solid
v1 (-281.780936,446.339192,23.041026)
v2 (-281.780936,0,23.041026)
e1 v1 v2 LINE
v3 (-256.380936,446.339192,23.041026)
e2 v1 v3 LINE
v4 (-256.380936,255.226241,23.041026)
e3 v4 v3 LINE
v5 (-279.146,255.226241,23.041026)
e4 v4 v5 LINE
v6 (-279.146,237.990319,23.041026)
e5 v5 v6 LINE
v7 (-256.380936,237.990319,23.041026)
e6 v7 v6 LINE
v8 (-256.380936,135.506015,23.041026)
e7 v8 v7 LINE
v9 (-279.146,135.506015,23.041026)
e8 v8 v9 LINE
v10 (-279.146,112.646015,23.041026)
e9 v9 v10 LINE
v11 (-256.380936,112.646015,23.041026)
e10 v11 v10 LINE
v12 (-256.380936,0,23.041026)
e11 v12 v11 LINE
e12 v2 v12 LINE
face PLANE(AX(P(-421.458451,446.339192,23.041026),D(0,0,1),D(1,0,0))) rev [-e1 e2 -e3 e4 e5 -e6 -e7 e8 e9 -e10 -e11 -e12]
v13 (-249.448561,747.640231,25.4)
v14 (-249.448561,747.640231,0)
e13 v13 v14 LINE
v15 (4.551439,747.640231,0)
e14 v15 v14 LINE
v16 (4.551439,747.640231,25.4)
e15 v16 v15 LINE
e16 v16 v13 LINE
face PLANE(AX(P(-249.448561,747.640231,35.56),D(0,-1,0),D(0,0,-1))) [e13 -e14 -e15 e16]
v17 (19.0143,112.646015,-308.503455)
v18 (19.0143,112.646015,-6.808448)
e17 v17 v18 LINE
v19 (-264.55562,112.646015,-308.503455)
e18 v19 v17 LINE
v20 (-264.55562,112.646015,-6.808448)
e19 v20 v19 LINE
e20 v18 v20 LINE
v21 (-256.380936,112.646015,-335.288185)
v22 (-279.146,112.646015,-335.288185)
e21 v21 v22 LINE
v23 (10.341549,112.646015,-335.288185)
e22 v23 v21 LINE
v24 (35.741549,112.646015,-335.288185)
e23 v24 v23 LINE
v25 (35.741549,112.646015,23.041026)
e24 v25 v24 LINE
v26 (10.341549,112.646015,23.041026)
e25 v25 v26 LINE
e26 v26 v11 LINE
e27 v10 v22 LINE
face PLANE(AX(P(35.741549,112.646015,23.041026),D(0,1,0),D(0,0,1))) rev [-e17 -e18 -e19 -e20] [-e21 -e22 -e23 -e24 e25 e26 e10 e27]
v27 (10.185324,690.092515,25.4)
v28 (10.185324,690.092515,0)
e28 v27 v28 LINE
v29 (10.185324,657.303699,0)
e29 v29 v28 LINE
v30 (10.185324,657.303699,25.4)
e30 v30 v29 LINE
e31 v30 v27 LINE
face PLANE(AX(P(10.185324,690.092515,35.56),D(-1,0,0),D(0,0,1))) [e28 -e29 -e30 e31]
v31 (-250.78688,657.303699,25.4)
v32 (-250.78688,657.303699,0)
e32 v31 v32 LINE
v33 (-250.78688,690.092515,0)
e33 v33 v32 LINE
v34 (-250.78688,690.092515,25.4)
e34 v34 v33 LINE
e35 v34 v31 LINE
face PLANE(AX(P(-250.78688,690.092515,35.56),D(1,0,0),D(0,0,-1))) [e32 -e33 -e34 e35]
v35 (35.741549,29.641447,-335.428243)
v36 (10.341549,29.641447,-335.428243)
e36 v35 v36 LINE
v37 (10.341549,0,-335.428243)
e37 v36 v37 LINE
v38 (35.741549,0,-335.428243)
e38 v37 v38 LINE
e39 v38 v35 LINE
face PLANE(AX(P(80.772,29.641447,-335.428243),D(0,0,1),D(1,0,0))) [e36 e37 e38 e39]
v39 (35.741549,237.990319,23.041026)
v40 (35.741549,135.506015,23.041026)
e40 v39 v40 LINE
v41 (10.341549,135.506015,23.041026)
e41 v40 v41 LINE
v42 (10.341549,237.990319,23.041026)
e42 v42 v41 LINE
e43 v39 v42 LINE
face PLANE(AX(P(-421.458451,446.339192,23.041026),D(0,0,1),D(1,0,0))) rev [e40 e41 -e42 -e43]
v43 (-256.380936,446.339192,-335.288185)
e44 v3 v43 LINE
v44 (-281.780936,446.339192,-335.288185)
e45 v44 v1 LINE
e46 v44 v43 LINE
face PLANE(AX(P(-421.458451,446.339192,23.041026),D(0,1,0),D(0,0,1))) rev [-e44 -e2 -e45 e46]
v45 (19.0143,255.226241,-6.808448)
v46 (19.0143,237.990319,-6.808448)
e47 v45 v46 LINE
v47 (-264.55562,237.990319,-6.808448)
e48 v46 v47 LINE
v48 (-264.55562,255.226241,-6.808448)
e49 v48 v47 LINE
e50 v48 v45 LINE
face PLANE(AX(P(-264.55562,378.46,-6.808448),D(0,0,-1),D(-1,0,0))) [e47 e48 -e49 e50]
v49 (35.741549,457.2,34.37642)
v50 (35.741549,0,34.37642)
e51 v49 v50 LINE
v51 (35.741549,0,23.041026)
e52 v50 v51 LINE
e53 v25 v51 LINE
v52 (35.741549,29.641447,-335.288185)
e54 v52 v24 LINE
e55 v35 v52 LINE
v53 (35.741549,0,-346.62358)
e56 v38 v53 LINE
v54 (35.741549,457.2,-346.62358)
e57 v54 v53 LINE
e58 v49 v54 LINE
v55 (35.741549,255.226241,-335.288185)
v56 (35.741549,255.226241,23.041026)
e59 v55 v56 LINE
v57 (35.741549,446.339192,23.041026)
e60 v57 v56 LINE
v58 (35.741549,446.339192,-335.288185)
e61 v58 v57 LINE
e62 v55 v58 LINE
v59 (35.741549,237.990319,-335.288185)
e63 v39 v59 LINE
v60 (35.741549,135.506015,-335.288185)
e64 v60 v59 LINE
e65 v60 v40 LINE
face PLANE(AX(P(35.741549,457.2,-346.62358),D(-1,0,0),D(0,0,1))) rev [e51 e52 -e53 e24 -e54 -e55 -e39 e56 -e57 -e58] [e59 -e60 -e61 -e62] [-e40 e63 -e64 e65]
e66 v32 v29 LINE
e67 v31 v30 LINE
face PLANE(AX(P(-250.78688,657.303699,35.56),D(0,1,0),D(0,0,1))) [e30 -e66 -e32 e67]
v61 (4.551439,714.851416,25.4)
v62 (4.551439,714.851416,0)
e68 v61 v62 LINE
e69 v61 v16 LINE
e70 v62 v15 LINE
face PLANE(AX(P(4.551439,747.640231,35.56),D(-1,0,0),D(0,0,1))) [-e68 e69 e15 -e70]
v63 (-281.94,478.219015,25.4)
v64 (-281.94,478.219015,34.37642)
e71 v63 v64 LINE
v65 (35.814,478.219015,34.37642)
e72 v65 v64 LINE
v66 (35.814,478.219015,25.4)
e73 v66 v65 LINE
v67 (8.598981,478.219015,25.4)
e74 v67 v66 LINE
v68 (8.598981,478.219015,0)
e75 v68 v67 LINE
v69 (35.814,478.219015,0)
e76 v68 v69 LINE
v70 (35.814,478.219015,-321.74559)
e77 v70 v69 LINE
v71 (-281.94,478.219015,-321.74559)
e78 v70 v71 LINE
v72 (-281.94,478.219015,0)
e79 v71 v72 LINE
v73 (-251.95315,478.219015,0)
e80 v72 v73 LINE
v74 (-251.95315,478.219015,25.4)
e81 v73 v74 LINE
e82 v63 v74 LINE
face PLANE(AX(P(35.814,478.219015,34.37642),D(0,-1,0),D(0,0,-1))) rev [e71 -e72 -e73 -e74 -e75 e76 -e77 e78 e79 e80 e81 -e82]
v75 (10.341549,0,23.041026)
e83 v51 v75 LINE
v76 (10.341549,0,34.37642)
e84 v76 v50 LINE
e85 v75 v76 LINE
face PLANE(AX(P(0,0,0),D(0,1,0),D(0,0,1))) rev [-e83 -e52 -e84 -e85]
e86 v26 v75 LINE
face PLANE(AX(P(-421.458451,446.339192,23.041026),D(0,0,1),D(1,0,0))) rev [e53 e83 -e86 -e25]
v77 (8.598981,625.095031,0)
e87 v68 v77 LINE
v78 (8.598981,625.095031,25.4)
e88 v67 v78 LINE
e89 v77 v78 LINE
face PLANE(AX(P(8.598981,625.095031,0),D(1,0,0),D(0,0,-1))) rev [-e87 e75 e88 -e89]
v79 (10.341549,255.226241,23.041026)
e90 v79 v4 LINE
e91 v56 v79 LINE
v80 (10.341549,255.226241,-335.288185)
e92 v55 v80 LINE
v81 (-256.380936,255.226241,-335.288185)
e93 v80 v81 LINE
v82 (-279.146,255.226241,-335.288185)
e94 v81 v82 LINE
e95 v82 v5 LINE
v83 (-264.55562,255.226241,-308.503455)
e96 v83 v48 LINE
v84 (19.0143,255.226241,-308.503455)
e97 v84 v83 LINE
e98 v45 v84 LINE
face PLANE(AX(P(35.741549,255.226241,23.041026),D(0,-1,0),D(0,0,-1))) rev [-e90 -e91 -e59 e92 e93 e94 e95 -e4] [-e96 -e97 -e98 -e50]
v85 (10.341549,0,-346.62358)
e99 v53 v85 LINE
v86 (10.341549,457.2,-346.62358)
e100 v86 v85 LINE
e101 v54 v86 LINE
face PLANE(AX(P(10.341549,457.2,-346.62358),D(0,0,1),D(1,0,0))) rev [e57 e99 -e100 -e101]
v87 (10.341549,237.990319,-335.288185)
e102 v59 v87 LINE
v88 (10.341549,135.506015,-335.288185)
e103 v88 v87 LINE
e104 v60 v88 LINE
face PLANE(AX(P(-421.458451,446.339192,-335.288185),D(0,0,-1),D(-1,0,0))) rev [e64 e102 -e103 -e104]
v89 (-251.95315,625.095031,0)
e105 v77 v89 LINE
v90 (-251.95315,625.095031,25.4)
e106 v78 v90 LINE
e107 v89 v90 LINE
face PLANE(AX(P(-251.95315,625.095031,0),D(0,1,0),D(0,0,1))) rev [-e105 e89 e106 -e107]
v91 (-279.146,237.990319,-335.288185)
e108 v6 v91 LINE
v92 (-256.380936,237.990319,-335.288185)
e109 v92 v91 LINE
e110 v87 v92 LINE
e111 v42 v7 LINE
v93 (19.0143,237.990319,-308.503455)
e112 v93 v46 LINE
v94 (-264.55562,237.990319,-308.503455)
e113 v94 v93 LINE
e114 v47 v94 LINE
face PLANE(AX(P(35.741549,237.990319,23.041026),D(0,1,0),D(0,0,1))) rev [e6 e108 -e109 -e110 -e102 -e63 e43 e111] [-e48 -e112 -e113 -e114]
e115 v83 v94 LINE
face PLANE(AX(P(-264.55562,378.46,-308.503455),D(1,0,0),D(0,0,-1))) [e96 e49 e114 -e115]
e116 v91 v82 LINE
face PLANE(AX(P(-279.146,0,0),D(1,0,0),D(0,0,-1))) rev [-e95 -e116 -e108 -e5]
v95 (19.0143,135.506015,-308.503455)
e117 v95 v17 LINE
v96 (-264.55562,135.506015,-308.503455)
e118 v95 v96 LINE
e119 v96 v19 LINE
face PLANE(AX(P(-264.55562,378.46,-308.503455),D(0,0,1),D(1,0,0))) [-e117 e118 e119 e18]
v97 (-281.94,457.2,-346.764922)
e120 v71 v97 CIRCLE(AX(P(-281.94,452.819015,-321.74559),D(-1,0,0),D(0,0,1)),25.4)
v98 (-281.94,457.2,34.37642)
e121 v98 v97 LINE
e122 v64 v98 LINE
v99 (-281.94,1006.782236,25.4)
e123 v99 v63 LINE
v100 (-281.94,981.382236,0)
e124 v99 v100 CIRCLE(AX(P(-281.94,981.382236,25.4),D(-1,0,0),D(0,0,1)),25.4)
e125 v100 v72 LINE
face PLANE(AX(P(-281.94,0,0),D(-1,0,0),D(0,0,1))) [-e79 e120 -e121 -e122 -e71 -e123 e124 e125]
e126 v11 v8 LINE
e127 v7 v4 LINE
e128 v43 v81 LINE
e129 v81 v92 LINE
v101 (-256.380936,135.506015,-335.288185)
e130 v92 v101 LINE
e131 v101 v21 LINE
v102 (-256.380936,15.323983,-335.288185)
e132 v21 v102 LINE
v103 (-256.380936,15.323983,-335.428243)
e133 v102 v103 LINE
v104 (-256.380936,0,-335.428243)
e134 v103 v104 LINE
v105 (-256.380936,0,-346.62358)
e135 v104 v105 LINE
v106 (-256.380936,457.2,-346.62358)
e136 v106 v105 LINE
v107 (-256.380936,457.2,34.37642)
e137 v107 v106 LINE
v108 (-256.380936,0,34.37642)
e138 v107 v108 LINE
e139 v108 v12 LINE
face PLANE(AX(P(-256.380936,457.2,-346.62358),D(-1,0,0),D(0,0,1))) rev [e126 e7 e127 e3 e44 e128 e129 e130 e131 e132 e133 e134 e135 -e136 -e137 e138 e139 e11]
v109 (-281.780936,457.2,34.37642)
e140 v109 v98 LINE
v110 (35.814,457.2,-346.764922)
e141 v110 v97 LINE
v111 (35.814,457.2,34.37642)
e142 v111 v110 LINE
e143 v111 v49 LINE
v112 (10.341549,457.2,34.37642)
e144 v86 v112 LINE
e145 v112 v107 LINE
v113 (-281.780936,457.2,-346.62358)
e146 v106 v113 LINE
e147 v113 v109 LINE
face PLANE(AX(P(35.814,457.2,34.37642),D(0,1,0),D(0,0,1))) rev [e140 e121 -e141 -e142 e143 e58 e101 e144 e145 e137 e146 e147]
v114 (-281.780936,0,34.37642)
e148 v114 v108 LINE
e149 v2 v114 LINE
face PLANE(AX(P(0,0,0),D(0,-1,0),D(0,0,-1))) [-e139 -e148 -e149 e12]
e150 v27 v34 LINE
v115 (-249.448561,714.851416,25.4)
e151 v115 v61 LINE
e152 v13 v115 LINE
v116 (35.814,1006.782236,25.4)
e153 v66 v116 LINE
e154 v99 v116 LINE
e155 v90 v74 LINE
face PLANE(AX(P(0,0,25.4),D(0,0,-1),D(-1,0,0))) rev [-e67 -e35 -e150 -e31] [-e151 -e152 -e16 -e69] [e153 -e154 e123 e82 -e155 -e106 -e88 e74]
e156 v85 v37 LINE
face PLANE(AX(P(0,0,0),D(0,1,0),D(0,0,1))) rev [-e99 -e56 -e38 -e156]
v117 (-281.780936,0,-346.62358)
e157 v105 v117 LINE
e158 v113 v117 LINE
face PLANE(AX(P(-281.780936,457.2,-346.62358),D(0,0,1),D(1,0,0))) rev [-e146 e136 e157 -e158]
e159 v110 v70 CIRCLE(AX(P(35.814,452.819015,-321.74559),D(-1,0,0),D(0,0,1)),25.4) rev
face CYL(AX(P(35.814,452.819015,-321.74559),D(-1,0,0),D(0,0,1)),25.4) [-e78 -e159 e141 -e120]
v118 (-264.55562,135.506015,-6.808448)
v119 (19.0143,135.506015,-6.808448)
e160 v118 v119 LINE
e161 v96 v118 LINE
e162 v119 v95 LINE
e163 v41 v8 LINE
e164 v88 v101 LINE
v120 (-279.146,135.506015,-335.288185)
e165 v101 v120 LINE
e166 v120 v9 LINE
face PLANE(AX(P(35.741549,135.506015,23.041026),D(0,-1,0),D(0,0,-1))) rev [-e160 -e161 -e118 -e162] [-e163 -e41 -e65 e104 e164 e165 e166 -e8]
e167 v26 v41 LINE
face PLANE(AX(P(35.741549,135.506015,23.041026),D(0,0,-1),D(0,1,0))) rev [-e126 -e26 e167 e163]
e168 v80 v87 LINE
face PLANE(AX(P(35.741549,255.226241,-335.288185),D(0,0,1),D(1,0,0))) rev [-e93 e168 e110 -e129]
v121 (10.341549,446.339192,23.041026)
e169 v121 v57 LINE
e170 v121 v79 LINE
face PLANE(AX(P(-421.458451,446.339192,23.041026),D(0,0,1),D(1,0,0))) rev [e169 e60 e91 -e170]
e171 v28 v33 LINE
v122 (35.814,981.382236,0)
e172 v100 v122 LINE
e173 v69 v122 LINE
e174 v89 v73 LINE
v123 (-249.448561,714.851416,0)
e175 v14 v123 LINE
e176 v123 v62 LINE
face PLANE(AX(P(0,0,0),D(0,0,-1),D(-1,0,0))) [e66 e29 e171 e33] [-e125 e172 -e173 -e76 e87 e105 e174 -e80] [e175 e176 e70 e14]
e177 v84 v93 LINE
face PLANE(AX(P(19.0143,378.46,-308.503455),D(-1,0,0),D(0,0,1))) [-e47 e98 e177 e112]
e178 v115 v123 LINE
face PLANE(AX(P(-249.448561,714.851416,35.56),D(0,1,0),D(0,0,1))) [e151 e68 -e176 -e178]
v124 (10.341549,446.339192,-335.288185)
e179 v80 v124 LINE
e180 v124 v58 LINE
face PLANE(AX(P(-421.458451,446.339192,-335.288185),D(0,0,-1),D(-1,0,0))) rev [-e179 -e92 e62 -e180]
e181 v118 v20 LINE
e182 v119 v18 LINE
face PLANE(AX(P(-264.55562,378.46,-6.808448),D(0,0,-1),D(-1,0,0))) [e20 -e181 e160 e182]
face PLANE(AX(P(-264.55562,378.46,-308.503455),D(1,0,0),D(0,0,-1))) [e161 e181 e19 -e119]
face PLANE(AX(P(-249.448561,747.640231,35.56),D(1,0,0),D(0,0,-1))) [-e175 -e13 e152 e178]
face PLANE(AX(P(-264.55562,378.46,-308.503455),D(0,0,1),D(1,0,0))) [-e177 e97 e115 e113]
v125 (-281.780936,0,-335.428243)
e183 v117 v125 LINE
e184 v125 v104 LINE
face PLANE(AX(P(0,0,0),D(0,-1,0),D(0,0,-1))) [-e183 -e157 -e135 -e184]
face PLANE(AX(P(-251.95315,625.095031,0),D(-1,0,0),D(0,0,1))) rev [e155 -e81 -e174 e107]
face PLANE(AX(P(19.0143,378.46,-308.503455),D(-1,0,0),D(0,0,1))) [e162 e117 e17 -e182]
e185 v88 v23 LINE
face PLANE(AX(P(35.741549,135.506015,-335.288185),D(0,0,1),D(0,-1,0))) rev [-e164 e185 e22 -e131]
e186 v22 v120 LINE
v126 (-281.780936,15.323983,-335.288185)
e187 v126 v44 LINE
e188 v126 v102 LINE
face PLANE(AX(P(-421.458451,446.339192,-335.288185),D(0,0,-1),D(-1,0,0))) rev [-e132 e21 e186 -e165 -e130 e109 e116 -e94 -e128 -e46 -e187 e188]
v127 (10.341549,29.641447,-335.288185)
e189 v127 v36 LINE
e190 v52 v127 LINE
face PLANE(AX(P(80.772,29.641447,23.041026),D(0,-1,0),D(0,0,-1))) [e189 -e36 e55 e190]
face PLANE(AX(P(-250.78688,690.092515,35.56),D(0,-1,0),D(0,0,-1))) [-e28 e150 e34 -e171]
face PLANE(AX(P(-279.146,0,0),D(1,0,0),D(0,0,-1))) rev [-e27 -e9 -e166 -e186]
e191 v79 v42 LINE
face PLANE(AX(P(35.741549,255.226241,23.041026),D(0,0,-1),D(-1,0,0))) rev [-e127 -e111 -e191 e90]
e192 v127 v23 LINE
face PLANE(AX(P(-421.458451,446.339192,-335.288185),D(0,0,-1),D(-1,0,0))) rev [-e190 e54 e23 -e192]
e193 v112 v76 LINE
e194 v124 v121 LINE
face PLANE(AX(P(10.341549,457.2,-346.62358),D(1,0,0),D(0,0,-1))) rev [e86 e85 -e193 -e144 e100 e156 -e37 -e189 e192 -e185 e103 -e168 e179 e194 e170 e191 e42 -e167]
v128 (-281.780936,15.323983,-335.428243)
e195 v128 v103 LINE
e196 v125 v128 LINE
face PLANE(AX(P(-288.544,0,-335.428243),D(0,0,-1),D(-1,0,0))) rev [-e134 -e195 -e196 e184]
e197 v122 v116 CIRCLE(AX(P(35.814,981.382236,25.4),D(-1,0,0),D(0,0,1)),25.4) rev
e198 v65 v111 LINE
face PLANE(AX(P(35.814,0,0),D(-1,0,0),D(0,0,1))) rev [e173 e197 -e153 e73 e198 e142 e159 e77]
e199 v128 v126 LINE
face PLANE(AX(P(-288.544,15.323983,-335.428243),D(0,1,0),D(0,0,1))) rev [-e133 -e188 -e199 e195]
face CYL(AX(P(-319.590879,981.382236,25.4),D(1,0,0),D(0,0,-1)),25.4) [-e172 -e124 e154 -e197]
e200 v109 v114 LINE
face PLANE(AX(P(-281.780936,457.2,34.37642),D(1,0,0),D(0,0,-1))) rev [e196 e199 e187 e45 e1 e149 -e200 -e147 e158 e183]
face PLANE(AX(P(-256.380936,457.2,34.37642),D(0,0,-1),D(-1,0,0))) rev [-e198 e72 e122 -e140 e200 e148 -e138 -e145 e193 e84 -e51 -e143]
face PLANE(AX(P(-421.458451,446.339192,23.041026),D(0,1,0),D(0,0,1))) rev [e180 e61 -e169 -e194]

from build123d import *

# Parameters (mm, degrees)
SKETCH1_W                = 25.4
SKETCH1_H                = 381
BOSS_EXTRUDE1_DEPTH      = 457.2
BOSS_EXTRUDE1_2_DEPTH    = 457.2
SKETCH5_W                = 358.329211732
SKETCH5_H                = 431.015208417
CUT_EXTRUDE1_DEPTH       = 457.2
BOSS_EXTRUDE7_DEPTH      = 35.814
BOSS_EXTRUDE7_DEPTH_BACK = 281.94
SKETCH13_W               = 381.141342185
SKETCH13_H               = 21.019014934
SKETCH14_W               = 317.754
SKETCH14_H               = 526.086170676
BOSS_EXTRUDE8_DEPTH      = 25.4
SKETCH17_W               = 260.552131225
SKETCH17_H               = 146.876016362
SKETCH17_H_2             = 29.104227424
CUT_EXTRUDE3_DEPTH       = 25.4
BOSS_EXTRUDE9_DEPTH      = 25.4
SKETCH19_W               = 260.972204044
SKETCH19_H               = 32.78881538
SKETCH19_W_2             = 254
CUT_EXTRUDE6_DEPTH       = 35.56
FILLET1_R                = 25.4
FILLET2_R                = 25.4
SKETCH20_W               = 358.469269341
SKETCH20_H               = 15.323983409
CUT_EXTRUDE7_DEPTH       = 288.544
SKETCH21_W               = 358.469269341
SKETCH21_H               = 29.641446852
CUT_EXTRUDE8_DEPTH       = 80.772
BOSS_EXTRUDE10_START     = -279.146
SKETCH22_W               = 358.329211732
SKETCH22_H               = 17.235921955
SKETCH22_H_2             = 22.86
BOSS_EXTRUDE10_DEPTH     = 314.887549
CUT_EXTRUDE9_DEPTH       = 378.46
CUT_EXTRUDE9_DEPTH_BACK  = 279.146
SKETCH23_W               = 283.569919334
SKETCH23_H               = 301.695006961
SKETCH24_W               = 411.753611465
SKETCH24_H               = 408.769889643
CUT_EXTRUDE11_DEPTH      = 75.946
FILLET3_R                = 25.4


# Some blends are built 0.0001 mm under size
with BuildPart() as part:
    # Sketch1 → Boss-Extrude1 (new body)
    with BuildSketch(Plane(origin=(0, 0, 0), x_dir=(1, 0, 0), z_dir=(0, 1, 0))):
        with Locations((-269.080936413, 156.123579529)):
            Rectangle(SKETCH1_W, SKETCH1_H)
    extrude(amount=BOSS_EXTRUDE1_DEPTH)


with BuildPart() as body_2:
    # Sketch1 → Boss-Extrude1 2 (new body)
    with BuildSketch(Plane(origin=(0, 0, 0), x_dir=(1, 0, 0), z_dir=(0, 1, 0))):
        with Locations((23.041549082, 156.123579529)):
            Rectangle(SKETCH1_W, SKETCH1_H)
    extrude(amount=BOSS_EXTRUDE1_2_DEPTH)


with BuildPart() as cut_extrude1_tool:
    # Sketch5 → Cut-Extrude1 (new body)
    with BuildSketch(Plane(origin=(35.741549082, 0, 0), x_dir=(0, 0, -1), z_dir=(1, 0, 0))):
        with Locations((156.123579529, 230.831587618)):
            Rectangle(SKETCH5_W, SKETCH5_H)
    extrude(amount=-CUT_EXTRUDE1_DEPTH)


with BuildPart() as part_1:
    add(part.part)

    # Cut-Extrude1: cut by cut_extrude1_tool
    add(cut_extrude1_tool.part, mode=Mode.SUBTRACT)



with BuildPart() as body_2_1:
    add(body_2.part)

    # Cut-Extrude1: cut by cut_extrude1_tool
    add(cut_extrude1_tool.part, mode=Mode.SUBTRACT)


with BuildPart() as part_2:
    add(part_1.part)

    add(body_2_1.part)  # Boss-Extrude7 merges body 2
    # Sketch13 → Boss-Extrude7 (add, two sides: drawn at the far end of the back side and taken through both)
    with BuildSketch(Plane(origin=(0, 0, 0), x_dir=(0, 0, -1), z_dir=(1, 0, 0)).offset(-BOSS_EXTRUDE7_DEPTH_BACK)):
        with Locations((156.194250622, 467.709507467)):
            Rectangle(SKETCH13_W, SKETCH13_H)
    extrude(amount=BOSS_EXTRUDE7_DEPTH + BOSS_EXTRUDE7_DEPTH_BACK)

    # Sketch14 → Boss-Extrude8 (add)
    with BuildSketch(Plane.XY):
        with Locations((-123.063, 730.752592805)):
            Rectangle(SKETCH14_W, SKETCH14_H)
    extrude(amount=BOSS_EXTRUDE8_DEPTH)

    # Sketch17 → Cut-Extrude3 (cut)
    with BuildSketch(Plane.XY.offset(25.4)):
        with Locations((-121.677084409, 551.657023115)):
            Rectangle(SKETCH17_W, SKETCH17_H)
        with Locations((-121.677084409, 663.207710066)):
            Rectangle(SKETCH17_W, SKETCH17_H_2)
        with Locations((-121.677084409, 710.328840181)):
            Rectangle(SKETCH17_W, SKETCH17_H_2)
    extrude(amount=-CUT_EXTRUDE3_DEPTH, mode=Mode.SUBTRACT)

    # Sketch18 → Boss-Extrude9 (add)
    with BuildSketch(Plane.XY):
        Polygon((-281.94, 993.795678143), (-281.94, 1247.795678143), (35.814, 1247.795678143), (35.814, 993.795678143), (35.814, 478.219014934), (8.598981204, 478.219014934), (8.598981204, 625.095031296), (-251.953150021, 625.095031296), (-251.953150021, 478.219014934), (-281.94, 478.219014934), align=None)
    extrude(amount=BOSS_EXTRUDE9_DEPTH)

    # Sketch19 → Cut-Extrude6 (cut)
    with BuildSketch(Plane.XY):
        with Locations((-120.300778352, 673.69810694)):
            Rectangle(SKETCH19_W, SKETCH19_H)
        with Locations((-122.448561379, 731.24582373)):
            Rectangle(SKETCH19_W_2, SKETCH19_H)
    extrude(amount=CUT_EXTRUDE6_DEPTH, mode=Mode.SUBTRACT)

    # Fillet1
    fillet1_edges = [part_2.edges().sort_by_distance(p)[0] for p in [
        (-123.063, 1247.795678143, 0),
    ]]
    fillet(fillet1_edges, radius=FILLET1_R - 0.0001)  # a hair under: the kernel refuses the full size

    # Fillet2
    # the kernel refuses this fillet: 25.4 mm, written as the material it takes off along each edge
    with BuildSketch(Plane(origin=(-344.488329806, 478.219014934, -346.764921714), x_dir=(0, 0, 1), z_dir=(1, 0, 0))) as fillet2_piece_1:
        with BuildLine():
            CenterArc((25.019331923, 25.4), FILLET2_R, 189.932027033, 80.067972967)
            Line((0, 21.019014934), (-0.500386638, 20.931395233))
            ThreePointArc((-0.500386638, 20.931395233), (-0.508, 10.509507467), (-0.508, 0))
            Line((-0.508, 0), (0, -0.508))
            Line((0, -0.508), (25.019331923, -0.508))
            Line((25.019331923, -0.508), (25.019331923, 0))
        make_face()
    extrude(amount=442.850659613, mode=Mode.SUBTRACT)

    # Sketch20 → Cut-Extrude7 (cut)
    with BuildSketch(Plane(origin=(0, 0, 0), x_dir=(0, 0, -1), z_dir=(1, 0, 0))):
        with Locations((156.193608334, 7.661991705)):
            Rectangle(SKETCH20_W, SKETCH20_H)
    extrude(amount=-CUT_EXTRUDE7_DEPTH, mode=Mode.SUBTRACT)

    # Sketch21 → Cut-Extrude8 (cut)
    with BuildSketch(Plane(origin=(0, 0, 0), x_dir=(0, 0, -1), z_dir=(1, 0, 0))):
        with Locations((156.193608334, 14.820723426)):
            Rectangle(SKETCH21_W, SKETCH21_H)
    extrude(amount=CUT_EXTRUDE8_DEPTH, mode=Mode.SUBTRACT)

    # Sketch22 → Boss-Extrude10 (add)
    with BuildSketch(Plane(origin=(0, 0, 0), x_dir=(0, 0, -1), z_dir=(1, 0, 0)).offset(BOSS_EXTRUDE10_START)):
        with Locations((156.123579529, 246.608280317)):
            Rectangle(SKETCH22_W, SKETCH22_H)
        with Locations((156.123579529, 124.076015291)):
            Rectangle(SKETCH22_W, SKETCH22_H_2)
    extrude(amount=BOSS_EXTRUDE10_DEPTH)

    # Sketch23 → Cut-Extrude9 (cut, two sides: drawn at the far end of the back side and taken through both)
    with BuildSketch(Plane(origin=(0, 0, 0), x_dir=(1, 0, 0), z_dir=(0, 1, 0)).offset(-CUT_EXTRUDE9_DEPTH_BACK)):
        with Locations((-122.770659877, 157.655951237)):
            Rectangle(SKETCH23_W, SKETCH23_H)
    extrude(amount=CUT_EXTRUDE9_DEPTH + CUT_EXTRUDE9_DEPTH_BACK, mode=Mode.SUBTRACT)

    # Sketch24 → Cut-Extrude11 (cut)
    with BuildSketch(Plane.XY.offset(25.4)):
        with Locations((-113.714072953, 1211.167180329)):
            Rectangle(SKETCH24_W, SKETCH24_H)
    extrude(amount=-CUT_EXTRUDE11_DEPTH, mode=Mode.SUBTRACT)

    # Fillet3
    fillet3_edges = [part_2.edges().sort_by_distance(p)[0] for p in [
        (-123.063, 1006.782235507, 0),
    ]]
    fillet(fillet3_edges, radius=FILLET3_R - 0.0001)  # a hair under: the kernel refuses the full size


solid = part_2.part
